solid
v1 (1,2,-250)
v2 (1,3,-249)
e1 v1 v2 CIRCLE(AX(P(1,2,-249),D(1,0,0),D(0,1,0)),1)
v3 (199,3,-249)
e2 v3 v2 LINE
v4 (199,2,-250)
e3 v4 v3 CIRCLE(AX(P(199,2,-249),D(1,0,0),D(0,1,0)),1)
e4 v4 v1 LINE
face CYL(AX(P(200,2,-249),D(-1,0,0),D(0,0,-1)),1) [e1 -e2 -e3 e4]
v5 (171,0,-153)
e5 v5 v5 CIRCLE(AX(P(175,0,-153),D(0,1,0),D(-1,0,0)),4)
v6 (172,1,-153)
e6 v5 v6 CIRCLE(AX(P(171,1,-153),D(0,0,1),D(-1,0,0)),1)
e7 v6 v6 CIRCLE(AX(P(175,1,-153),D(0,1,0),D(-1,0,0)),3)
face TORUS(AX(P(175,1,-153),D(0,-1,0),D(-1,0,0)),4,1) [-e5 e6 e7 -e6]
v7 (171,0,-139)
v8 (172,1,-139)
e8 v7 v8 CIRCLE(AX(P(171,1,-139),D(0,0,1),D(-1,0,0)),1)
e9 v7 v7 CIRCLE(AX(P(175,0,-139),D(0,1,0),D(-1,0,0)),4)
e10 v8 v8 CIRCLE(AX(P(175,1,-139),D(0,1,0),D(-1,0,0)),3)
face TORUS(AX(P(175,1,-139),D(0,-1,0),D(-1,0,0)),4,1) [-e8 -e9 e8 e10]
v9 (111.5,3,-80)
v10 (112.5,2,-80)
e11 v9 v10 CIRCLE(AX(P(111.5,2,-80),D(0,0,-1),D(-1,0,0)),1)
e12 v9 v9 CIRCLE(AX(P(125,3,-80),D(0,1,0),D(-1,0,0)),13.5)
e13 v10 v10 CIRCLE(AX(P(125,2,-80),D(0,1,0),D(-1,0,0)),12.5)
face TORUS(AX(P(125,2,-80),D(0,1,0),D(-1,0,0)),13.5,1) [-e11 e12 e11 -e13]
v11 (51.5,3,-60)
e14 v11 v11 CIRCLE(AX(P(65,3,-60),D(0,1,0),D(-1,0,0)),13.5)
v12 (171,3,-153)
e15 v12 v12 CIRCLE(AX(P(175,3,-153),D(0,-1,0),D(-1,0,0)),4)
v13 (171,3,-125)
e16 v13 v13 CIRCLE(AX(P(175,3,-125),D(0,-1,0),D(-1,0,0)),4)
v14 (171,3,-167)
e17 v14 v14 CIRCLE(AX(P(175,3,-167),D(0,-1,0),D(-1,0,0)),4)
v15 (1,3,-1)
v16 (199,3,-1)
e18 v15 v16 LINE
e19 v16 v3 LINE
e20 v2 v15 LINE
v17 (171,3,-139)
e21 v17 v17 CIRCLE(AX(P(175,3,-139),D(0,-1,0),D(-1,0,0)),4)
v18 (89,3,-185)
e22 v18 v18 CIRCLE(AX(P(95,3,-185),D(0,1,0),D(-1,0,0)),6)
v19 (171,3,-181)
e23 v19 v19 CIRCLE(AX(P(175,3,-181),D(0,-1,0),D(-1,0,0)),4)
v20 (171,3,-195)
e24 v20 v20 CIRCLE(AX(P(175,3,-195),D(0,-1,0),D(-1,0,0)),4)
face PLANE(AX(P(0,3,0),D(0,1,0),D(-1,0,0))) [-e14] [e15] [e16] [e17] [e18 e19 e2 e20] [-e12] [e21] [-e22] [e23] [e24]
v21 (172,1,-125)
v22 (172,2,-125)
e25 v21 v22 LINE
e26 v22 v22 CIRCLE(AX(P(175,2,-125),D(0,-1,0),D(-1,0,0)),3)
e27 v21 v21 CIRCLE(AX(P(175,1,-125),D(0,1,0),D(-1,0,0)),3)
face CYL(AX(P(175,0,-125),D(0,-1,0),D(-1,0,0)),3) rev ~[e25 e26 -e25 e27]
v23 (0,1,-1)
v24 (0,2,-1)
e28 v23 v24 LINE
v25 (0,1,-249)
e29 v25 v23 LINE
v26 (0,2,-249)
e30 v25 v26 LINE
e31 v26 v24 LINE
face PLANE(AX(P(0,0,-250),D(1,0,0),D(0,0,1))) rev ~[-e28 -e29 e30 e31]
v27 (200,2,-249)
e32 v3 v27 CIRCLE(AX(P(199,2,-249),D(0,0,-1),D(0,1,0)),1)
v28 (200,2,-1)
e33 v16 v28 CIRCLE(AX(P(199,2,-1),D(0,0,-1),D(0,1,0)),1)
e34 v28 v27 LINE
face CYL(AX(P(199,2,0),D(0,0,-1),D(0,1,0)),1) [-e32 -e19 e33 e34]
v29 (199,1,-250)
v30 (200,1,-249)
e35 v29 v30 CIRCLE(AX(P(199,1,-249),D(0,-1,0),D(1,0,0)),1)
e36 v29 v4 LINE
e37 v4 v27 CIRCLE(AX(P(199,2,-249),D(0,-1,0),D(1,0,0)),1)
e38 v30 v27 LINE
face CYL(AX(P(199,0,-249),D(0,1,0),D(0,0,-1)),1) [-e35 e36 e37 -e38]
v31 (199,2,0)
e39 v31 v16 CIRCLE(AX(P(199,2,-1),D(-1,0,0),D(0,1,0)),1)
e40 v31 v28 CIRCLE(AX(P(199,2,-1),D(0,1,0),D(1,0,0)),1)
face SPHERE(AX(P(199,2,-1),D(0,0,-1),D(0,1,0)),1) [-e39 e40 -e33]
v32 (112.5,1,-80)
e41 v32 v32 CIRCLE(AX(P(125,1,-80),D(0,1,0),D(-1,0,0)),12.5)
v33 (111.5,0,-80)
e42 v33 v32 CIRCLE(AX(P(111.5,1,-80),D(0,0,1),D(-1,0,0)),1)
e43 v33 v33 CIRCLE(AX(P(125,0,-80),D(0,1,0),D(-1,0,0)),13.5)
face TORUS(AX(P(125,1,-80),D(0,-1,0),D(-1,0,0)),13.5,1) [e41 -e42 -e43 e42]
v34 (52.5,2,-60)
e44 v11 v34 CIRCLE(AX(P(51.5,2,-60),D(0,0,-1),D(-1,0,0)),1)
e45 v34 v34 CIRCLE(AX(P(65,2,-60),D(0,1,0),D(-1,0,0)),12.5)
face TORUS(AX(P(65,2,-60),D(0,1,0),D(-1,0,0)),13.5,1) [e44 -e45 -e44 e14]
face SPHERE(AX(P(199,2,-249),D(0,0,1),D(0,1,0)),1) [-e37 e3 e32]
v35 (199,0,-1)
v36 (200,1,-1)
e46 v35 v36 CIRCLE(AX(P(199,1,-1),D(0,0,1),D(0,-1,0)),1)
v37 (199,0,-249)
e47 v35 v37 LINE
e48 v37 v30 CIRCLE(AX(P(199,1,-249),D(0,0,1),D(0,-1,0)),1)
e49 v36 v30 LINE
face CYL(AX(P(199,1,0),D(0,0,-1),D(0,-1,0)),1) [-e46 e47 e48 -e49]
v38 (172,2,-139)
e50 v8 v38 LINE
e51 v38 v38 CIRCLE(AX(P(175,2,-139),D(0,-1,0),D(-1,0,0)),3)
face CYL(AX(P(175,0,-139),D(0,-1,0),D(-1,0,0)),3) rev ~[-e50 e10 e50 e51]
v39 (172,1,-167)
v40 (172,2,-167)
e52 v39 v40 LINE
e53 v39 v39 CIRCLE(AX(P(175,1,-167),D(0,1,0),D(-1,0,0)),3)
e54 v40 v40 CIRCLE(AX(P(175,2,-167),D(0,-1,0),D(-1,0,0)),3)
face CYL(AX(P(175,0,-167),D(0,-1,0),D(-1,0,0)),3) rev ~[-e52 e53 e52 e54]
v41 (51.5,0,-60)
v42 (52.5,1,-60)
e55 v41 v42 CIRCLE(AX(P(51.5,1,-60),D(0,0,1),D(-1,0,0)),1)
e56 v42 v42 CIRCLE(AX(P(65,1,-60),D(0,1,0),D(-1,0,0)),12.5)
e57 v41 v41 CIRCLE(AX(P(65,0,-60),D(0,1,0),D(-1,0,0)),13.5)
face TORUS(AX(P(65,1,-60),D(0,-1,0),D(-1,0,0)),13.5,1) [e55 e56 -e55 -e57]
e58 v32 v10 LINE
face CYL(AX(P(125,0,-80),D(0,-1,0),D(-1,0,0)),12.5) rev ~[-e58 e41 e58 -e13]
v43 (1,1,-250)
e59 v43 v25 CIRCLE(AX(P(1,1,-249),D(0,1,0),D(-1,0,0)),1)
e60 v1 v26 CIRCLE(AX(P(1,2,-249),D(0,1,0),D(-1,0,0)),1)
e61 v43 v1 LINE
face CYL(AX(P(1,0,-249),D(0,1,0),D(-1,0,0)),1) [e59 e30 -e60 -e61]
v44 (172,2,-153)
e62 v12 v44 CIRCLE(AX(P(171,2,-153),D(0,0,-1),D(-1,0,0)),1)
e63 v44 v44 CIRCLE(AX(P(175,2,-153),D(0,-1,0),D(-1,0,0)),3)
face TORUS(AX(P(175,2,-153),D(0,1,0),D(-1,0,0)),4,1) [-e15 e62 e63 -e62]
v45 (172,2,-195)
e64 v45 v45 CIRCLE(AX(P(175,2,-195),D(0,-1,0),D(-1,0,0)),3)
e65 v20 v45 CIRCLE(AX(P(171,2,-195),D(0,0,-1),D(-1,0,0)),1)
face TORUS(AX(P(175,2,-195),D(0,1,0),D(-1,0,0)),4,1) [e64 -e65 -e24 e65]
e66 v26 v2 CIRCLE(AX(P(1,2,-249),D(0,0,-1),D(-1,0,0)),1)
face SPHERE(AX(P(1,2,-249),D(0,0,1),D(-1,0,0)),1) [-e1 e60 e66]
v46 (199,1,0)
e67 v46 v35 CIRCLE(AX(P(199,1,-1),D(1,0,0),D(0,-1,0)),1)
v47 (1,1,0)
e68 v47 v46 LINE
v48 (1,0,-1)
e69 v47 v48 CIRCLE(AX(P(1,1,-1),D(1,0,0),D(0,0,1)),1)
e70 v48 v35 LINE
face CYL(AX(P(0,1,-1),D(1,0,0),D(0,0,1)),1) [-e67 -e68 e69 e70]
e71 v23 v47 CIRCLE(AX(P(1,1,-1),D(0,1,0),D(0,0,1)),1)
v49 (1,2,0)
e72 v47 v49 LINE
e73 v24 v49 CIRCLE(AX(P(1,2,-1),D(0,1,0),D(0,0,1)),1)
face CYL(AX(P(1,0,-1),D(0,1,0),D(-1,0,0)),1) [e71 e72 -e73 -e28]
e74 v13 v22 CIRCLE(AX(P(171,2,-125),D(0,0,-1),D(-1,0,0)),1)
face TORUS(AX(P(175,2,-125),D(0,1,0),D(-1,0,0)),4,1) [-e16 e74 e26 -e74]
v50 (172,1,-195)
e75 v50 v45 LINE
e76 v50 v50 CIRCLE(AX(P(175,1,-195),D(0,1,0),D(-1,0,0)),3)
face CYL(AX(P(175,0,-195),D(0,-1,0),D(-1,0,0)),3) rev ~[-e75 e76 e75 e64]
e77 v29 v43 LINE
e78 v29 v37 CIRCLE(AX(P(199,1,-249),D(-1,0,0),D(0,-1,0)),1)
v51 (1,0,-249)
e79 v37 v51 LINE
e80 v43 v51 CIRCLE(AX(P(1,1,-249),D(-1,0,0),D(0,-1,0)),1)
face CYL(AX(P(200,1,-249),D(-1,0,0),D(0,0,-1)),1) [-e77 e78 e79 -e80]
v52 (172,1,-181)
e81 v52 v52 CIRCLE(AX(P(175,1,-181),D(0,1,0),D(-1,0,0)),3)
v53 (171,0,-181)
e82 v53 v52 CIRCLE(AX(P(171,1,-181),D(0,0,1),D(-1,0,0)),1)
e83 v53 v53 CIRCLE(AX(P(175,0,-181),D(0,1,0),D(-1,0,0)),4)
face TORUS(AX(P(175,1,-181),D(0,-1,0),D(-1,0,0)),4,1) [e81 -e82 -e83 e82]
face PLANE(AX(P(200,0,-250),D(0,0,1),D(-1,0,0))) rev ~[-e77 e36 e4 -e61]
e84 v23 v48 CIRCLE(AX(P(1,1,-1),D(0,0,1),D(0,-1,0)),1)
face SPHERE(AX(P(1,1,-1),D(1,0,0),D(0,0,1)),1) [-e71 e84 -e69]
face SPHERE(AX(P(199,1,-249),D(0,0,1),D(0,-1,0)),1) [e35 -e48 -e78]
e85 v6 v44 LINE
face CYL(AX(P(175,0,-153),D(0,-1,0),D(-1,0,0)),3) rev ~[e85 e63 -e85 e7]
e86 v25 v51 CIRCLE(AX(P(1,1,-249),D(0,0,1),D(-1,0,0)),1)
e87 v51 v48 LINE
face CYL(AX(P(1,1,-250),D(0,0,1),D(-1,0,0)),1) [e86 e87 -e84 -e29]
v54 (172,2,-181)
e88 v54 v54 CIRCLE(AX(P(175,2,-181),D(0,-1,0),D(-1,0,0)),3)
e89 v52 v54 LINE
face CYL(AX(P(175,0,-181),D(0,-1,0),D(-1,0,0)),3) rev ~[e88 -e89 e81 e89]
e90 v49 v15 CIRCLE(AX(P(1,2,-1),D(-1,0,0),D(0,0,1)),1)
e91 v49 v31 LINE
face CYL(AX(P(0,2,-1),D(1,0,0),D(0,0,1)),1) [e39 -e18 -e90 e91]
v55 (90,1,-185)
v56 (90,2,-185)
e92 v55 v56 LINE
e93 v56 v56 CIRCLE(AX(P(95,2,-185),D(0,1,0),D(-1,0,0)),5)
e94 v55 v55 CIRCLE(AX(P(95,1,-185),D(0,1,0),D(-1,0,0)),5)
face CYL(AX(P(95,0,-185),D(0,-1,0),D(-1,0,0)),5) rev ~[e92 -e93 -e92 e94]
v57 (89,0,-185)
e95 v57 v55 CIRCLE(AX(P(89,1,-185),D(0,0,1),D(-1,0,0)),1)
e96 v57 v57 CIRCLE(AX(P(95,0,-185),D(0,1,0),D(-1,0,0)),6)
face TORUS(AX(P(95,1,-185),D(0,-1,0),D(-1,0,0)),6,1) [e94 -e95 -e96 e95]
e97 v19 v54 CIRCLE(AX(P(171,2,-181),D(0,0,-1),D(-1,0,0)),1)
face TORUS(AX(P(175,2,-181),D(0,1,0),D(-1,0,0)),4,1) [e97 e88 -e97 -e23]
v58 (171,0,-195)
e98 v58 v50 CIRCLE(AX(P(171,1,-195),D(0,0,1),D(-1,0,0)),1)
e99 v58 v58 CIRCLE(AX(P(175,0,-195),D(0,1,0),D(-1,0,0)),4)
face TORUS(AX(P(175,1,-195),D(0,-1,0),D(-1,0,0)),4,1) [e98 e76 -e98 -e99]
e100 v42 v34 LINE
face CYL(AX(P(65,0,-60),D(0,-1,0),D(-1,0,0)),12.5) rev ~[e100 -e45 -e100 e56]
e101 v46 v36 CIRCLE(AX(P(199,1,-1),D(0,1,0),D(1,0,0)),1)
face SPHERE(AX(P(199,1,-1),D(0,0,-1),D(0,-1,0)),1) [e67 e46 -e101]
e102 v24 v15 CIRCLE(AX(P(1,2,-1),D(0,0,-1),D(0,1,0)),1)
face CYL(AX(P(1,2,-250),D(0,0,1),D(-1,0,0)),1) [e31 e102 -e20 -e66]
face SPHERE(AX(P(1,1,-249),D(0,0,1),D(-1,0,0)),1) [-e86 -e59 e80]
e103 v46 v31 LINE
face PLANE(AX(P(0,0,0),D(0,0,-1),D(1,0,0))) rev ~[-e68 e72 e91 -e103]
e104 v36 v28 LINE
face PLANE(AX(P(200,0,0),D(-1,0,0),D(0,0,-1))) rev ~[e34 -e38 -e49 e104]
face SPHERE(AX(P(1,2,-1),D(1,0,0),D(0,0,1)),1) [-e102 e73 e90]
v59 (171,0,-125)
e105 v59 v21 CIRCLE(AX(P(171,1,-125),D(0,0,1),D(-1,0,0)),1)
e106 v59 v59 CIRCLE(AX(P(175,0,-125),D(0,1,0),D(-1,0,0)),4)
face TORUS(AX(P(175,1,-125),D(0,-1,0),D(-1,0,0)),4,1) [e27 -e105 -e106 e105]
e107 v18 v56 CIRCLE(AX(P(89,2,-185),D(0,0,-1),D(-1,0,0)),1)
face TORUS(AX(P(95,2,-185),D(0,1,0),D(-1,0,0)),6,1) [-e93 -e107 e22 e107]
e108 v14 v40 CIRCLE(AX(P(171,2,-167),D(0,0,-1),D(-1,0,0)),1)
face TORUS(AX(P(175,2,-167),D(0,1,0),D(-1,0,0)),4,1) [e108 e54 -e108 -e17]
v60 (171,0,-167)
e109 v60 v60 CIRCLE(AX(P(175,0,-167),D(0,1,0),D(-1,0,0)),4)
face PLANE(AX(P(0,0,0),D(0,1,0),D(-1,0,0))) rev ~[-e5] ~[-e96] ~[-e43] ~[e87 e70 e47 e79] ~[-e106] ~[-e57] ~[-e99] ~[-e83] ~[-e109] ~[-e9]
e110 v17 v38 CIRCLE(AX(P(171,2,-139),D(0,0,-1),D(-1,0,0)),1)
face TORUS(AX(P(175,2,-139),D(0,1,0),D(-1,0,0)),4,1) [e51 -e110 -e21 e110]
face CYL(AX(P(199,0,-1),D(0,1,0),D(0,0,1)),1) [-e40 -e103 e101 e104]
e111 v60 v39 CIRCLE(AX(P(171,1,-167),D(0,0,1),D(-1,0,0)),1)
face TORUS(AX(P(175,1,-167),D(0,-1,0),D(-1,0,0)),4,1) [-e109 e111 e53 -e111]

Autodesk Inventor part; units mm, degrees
ref_plane "YZ Plane" through (0, 0, 0) normal (1, 0, 0) x (0, 1, 0)
ref_plane "XZ Plane" through (0, 0, 0) normal (0, 1, 0) x (-1, 0, 0)
ref_plane "XY Plane" through (0, 0, 0) normal (0, 0, 1) x (1, 0, 0)
sketch "page_lines" plane through (0, 0, 0) normal (0, 1, 0) x (-1, 0, 0)
  line L0 (0, 0) -> (-200, 0)
  line L1 (-200, 0) -> (-200, -250)
  line L2 (-200, -250) -> (0, -250)
  line L3 (0, -250) -> (0, 0)
  circle A0 centre (-65, -60) radius 6
  circle A1 centre (-125, -80) radius 6
  circle A2 centre (-65, -60) radius 12.5
  circle A3 centre (-65, -60) radius 8.5
  circle A4 centre (-125, -80) radius 8.5
  circle A5 centre (-125, -80) radius 12.5
  circle A6 centre (-175, -125) radius 3
  line L4 (-175, -125) -> (-175, -209)
  line L5 (-175, -125) -> (-91, -125) construction
  circle A7 centre (-175, -139) radius 3
  circle A8 centre (-175, -153) radius 3
  circle A9 centre (-175, -167) radius 3
  circle A10 centre (-175, -181) radius 3
  circle A11 centre (-175, -195) radius 3
  circle A12 centre (-175, -209) radius 3
  circle A13 centre (-95, -185) radius 2.5
  circle A14 centre (-95, -185) radius 5
  point P0 (-200, -125)
  dimension "d0" = 200
  dimension "d1" = 250
  dimension "d2" = 12
  dimension "d3" = 12
  dimension "d4" = 25
  dimension "d5" = 17
  dimension "d6" = 17
  dimension "d7" = 25
  dimension "d8" = 75
  dimension "d9" = 80
  dimension "d10" = 65
  dimension "d11" = 60
  dimension "d12" = 6
  dimension "d13" = 84
  dimension "d14" = 90
  dimension "d15" = 25
  dimension "d16" = 125
  dimension "d19" = 14
  dimension "d24" = 5
  dimension "d25" = 10
  dimension "d26" = 65
  dimension "d27" = 95
extrude "xor" add sketch "page_lines" along normal blind 3 contours L3 L2 L1 L0 | A12
fillet "Fillet1" radius 1 30 edges at (77.5, 3, -60) (77.5, 0, -60) (100, 3, -185) (100, 0, -185) (178, 3, -125) (178, 0, -125) (200, 3, -125) (200, 0, -125) (100, 0, 0) (100, 3, 0) (200, 1.5, 0) (0, 1.5, 0) (0, 3, -125) (0, 0, -125) (0, 1.5, -250) (100, 3, -250) (100, 0, -250) (200, 1.5, -250) (178, 3, -139) (178, 0, -139) (137.5, 3, -80) (137.5, 0, -80) (178, 3, -153) (178, 0, -153) (178, 3, -167) (178, 0, -167) (178, 3, -181) (178, 0, -181) (178, 0, -195) (178, 3, -195)
properties part number "pages_xor"
